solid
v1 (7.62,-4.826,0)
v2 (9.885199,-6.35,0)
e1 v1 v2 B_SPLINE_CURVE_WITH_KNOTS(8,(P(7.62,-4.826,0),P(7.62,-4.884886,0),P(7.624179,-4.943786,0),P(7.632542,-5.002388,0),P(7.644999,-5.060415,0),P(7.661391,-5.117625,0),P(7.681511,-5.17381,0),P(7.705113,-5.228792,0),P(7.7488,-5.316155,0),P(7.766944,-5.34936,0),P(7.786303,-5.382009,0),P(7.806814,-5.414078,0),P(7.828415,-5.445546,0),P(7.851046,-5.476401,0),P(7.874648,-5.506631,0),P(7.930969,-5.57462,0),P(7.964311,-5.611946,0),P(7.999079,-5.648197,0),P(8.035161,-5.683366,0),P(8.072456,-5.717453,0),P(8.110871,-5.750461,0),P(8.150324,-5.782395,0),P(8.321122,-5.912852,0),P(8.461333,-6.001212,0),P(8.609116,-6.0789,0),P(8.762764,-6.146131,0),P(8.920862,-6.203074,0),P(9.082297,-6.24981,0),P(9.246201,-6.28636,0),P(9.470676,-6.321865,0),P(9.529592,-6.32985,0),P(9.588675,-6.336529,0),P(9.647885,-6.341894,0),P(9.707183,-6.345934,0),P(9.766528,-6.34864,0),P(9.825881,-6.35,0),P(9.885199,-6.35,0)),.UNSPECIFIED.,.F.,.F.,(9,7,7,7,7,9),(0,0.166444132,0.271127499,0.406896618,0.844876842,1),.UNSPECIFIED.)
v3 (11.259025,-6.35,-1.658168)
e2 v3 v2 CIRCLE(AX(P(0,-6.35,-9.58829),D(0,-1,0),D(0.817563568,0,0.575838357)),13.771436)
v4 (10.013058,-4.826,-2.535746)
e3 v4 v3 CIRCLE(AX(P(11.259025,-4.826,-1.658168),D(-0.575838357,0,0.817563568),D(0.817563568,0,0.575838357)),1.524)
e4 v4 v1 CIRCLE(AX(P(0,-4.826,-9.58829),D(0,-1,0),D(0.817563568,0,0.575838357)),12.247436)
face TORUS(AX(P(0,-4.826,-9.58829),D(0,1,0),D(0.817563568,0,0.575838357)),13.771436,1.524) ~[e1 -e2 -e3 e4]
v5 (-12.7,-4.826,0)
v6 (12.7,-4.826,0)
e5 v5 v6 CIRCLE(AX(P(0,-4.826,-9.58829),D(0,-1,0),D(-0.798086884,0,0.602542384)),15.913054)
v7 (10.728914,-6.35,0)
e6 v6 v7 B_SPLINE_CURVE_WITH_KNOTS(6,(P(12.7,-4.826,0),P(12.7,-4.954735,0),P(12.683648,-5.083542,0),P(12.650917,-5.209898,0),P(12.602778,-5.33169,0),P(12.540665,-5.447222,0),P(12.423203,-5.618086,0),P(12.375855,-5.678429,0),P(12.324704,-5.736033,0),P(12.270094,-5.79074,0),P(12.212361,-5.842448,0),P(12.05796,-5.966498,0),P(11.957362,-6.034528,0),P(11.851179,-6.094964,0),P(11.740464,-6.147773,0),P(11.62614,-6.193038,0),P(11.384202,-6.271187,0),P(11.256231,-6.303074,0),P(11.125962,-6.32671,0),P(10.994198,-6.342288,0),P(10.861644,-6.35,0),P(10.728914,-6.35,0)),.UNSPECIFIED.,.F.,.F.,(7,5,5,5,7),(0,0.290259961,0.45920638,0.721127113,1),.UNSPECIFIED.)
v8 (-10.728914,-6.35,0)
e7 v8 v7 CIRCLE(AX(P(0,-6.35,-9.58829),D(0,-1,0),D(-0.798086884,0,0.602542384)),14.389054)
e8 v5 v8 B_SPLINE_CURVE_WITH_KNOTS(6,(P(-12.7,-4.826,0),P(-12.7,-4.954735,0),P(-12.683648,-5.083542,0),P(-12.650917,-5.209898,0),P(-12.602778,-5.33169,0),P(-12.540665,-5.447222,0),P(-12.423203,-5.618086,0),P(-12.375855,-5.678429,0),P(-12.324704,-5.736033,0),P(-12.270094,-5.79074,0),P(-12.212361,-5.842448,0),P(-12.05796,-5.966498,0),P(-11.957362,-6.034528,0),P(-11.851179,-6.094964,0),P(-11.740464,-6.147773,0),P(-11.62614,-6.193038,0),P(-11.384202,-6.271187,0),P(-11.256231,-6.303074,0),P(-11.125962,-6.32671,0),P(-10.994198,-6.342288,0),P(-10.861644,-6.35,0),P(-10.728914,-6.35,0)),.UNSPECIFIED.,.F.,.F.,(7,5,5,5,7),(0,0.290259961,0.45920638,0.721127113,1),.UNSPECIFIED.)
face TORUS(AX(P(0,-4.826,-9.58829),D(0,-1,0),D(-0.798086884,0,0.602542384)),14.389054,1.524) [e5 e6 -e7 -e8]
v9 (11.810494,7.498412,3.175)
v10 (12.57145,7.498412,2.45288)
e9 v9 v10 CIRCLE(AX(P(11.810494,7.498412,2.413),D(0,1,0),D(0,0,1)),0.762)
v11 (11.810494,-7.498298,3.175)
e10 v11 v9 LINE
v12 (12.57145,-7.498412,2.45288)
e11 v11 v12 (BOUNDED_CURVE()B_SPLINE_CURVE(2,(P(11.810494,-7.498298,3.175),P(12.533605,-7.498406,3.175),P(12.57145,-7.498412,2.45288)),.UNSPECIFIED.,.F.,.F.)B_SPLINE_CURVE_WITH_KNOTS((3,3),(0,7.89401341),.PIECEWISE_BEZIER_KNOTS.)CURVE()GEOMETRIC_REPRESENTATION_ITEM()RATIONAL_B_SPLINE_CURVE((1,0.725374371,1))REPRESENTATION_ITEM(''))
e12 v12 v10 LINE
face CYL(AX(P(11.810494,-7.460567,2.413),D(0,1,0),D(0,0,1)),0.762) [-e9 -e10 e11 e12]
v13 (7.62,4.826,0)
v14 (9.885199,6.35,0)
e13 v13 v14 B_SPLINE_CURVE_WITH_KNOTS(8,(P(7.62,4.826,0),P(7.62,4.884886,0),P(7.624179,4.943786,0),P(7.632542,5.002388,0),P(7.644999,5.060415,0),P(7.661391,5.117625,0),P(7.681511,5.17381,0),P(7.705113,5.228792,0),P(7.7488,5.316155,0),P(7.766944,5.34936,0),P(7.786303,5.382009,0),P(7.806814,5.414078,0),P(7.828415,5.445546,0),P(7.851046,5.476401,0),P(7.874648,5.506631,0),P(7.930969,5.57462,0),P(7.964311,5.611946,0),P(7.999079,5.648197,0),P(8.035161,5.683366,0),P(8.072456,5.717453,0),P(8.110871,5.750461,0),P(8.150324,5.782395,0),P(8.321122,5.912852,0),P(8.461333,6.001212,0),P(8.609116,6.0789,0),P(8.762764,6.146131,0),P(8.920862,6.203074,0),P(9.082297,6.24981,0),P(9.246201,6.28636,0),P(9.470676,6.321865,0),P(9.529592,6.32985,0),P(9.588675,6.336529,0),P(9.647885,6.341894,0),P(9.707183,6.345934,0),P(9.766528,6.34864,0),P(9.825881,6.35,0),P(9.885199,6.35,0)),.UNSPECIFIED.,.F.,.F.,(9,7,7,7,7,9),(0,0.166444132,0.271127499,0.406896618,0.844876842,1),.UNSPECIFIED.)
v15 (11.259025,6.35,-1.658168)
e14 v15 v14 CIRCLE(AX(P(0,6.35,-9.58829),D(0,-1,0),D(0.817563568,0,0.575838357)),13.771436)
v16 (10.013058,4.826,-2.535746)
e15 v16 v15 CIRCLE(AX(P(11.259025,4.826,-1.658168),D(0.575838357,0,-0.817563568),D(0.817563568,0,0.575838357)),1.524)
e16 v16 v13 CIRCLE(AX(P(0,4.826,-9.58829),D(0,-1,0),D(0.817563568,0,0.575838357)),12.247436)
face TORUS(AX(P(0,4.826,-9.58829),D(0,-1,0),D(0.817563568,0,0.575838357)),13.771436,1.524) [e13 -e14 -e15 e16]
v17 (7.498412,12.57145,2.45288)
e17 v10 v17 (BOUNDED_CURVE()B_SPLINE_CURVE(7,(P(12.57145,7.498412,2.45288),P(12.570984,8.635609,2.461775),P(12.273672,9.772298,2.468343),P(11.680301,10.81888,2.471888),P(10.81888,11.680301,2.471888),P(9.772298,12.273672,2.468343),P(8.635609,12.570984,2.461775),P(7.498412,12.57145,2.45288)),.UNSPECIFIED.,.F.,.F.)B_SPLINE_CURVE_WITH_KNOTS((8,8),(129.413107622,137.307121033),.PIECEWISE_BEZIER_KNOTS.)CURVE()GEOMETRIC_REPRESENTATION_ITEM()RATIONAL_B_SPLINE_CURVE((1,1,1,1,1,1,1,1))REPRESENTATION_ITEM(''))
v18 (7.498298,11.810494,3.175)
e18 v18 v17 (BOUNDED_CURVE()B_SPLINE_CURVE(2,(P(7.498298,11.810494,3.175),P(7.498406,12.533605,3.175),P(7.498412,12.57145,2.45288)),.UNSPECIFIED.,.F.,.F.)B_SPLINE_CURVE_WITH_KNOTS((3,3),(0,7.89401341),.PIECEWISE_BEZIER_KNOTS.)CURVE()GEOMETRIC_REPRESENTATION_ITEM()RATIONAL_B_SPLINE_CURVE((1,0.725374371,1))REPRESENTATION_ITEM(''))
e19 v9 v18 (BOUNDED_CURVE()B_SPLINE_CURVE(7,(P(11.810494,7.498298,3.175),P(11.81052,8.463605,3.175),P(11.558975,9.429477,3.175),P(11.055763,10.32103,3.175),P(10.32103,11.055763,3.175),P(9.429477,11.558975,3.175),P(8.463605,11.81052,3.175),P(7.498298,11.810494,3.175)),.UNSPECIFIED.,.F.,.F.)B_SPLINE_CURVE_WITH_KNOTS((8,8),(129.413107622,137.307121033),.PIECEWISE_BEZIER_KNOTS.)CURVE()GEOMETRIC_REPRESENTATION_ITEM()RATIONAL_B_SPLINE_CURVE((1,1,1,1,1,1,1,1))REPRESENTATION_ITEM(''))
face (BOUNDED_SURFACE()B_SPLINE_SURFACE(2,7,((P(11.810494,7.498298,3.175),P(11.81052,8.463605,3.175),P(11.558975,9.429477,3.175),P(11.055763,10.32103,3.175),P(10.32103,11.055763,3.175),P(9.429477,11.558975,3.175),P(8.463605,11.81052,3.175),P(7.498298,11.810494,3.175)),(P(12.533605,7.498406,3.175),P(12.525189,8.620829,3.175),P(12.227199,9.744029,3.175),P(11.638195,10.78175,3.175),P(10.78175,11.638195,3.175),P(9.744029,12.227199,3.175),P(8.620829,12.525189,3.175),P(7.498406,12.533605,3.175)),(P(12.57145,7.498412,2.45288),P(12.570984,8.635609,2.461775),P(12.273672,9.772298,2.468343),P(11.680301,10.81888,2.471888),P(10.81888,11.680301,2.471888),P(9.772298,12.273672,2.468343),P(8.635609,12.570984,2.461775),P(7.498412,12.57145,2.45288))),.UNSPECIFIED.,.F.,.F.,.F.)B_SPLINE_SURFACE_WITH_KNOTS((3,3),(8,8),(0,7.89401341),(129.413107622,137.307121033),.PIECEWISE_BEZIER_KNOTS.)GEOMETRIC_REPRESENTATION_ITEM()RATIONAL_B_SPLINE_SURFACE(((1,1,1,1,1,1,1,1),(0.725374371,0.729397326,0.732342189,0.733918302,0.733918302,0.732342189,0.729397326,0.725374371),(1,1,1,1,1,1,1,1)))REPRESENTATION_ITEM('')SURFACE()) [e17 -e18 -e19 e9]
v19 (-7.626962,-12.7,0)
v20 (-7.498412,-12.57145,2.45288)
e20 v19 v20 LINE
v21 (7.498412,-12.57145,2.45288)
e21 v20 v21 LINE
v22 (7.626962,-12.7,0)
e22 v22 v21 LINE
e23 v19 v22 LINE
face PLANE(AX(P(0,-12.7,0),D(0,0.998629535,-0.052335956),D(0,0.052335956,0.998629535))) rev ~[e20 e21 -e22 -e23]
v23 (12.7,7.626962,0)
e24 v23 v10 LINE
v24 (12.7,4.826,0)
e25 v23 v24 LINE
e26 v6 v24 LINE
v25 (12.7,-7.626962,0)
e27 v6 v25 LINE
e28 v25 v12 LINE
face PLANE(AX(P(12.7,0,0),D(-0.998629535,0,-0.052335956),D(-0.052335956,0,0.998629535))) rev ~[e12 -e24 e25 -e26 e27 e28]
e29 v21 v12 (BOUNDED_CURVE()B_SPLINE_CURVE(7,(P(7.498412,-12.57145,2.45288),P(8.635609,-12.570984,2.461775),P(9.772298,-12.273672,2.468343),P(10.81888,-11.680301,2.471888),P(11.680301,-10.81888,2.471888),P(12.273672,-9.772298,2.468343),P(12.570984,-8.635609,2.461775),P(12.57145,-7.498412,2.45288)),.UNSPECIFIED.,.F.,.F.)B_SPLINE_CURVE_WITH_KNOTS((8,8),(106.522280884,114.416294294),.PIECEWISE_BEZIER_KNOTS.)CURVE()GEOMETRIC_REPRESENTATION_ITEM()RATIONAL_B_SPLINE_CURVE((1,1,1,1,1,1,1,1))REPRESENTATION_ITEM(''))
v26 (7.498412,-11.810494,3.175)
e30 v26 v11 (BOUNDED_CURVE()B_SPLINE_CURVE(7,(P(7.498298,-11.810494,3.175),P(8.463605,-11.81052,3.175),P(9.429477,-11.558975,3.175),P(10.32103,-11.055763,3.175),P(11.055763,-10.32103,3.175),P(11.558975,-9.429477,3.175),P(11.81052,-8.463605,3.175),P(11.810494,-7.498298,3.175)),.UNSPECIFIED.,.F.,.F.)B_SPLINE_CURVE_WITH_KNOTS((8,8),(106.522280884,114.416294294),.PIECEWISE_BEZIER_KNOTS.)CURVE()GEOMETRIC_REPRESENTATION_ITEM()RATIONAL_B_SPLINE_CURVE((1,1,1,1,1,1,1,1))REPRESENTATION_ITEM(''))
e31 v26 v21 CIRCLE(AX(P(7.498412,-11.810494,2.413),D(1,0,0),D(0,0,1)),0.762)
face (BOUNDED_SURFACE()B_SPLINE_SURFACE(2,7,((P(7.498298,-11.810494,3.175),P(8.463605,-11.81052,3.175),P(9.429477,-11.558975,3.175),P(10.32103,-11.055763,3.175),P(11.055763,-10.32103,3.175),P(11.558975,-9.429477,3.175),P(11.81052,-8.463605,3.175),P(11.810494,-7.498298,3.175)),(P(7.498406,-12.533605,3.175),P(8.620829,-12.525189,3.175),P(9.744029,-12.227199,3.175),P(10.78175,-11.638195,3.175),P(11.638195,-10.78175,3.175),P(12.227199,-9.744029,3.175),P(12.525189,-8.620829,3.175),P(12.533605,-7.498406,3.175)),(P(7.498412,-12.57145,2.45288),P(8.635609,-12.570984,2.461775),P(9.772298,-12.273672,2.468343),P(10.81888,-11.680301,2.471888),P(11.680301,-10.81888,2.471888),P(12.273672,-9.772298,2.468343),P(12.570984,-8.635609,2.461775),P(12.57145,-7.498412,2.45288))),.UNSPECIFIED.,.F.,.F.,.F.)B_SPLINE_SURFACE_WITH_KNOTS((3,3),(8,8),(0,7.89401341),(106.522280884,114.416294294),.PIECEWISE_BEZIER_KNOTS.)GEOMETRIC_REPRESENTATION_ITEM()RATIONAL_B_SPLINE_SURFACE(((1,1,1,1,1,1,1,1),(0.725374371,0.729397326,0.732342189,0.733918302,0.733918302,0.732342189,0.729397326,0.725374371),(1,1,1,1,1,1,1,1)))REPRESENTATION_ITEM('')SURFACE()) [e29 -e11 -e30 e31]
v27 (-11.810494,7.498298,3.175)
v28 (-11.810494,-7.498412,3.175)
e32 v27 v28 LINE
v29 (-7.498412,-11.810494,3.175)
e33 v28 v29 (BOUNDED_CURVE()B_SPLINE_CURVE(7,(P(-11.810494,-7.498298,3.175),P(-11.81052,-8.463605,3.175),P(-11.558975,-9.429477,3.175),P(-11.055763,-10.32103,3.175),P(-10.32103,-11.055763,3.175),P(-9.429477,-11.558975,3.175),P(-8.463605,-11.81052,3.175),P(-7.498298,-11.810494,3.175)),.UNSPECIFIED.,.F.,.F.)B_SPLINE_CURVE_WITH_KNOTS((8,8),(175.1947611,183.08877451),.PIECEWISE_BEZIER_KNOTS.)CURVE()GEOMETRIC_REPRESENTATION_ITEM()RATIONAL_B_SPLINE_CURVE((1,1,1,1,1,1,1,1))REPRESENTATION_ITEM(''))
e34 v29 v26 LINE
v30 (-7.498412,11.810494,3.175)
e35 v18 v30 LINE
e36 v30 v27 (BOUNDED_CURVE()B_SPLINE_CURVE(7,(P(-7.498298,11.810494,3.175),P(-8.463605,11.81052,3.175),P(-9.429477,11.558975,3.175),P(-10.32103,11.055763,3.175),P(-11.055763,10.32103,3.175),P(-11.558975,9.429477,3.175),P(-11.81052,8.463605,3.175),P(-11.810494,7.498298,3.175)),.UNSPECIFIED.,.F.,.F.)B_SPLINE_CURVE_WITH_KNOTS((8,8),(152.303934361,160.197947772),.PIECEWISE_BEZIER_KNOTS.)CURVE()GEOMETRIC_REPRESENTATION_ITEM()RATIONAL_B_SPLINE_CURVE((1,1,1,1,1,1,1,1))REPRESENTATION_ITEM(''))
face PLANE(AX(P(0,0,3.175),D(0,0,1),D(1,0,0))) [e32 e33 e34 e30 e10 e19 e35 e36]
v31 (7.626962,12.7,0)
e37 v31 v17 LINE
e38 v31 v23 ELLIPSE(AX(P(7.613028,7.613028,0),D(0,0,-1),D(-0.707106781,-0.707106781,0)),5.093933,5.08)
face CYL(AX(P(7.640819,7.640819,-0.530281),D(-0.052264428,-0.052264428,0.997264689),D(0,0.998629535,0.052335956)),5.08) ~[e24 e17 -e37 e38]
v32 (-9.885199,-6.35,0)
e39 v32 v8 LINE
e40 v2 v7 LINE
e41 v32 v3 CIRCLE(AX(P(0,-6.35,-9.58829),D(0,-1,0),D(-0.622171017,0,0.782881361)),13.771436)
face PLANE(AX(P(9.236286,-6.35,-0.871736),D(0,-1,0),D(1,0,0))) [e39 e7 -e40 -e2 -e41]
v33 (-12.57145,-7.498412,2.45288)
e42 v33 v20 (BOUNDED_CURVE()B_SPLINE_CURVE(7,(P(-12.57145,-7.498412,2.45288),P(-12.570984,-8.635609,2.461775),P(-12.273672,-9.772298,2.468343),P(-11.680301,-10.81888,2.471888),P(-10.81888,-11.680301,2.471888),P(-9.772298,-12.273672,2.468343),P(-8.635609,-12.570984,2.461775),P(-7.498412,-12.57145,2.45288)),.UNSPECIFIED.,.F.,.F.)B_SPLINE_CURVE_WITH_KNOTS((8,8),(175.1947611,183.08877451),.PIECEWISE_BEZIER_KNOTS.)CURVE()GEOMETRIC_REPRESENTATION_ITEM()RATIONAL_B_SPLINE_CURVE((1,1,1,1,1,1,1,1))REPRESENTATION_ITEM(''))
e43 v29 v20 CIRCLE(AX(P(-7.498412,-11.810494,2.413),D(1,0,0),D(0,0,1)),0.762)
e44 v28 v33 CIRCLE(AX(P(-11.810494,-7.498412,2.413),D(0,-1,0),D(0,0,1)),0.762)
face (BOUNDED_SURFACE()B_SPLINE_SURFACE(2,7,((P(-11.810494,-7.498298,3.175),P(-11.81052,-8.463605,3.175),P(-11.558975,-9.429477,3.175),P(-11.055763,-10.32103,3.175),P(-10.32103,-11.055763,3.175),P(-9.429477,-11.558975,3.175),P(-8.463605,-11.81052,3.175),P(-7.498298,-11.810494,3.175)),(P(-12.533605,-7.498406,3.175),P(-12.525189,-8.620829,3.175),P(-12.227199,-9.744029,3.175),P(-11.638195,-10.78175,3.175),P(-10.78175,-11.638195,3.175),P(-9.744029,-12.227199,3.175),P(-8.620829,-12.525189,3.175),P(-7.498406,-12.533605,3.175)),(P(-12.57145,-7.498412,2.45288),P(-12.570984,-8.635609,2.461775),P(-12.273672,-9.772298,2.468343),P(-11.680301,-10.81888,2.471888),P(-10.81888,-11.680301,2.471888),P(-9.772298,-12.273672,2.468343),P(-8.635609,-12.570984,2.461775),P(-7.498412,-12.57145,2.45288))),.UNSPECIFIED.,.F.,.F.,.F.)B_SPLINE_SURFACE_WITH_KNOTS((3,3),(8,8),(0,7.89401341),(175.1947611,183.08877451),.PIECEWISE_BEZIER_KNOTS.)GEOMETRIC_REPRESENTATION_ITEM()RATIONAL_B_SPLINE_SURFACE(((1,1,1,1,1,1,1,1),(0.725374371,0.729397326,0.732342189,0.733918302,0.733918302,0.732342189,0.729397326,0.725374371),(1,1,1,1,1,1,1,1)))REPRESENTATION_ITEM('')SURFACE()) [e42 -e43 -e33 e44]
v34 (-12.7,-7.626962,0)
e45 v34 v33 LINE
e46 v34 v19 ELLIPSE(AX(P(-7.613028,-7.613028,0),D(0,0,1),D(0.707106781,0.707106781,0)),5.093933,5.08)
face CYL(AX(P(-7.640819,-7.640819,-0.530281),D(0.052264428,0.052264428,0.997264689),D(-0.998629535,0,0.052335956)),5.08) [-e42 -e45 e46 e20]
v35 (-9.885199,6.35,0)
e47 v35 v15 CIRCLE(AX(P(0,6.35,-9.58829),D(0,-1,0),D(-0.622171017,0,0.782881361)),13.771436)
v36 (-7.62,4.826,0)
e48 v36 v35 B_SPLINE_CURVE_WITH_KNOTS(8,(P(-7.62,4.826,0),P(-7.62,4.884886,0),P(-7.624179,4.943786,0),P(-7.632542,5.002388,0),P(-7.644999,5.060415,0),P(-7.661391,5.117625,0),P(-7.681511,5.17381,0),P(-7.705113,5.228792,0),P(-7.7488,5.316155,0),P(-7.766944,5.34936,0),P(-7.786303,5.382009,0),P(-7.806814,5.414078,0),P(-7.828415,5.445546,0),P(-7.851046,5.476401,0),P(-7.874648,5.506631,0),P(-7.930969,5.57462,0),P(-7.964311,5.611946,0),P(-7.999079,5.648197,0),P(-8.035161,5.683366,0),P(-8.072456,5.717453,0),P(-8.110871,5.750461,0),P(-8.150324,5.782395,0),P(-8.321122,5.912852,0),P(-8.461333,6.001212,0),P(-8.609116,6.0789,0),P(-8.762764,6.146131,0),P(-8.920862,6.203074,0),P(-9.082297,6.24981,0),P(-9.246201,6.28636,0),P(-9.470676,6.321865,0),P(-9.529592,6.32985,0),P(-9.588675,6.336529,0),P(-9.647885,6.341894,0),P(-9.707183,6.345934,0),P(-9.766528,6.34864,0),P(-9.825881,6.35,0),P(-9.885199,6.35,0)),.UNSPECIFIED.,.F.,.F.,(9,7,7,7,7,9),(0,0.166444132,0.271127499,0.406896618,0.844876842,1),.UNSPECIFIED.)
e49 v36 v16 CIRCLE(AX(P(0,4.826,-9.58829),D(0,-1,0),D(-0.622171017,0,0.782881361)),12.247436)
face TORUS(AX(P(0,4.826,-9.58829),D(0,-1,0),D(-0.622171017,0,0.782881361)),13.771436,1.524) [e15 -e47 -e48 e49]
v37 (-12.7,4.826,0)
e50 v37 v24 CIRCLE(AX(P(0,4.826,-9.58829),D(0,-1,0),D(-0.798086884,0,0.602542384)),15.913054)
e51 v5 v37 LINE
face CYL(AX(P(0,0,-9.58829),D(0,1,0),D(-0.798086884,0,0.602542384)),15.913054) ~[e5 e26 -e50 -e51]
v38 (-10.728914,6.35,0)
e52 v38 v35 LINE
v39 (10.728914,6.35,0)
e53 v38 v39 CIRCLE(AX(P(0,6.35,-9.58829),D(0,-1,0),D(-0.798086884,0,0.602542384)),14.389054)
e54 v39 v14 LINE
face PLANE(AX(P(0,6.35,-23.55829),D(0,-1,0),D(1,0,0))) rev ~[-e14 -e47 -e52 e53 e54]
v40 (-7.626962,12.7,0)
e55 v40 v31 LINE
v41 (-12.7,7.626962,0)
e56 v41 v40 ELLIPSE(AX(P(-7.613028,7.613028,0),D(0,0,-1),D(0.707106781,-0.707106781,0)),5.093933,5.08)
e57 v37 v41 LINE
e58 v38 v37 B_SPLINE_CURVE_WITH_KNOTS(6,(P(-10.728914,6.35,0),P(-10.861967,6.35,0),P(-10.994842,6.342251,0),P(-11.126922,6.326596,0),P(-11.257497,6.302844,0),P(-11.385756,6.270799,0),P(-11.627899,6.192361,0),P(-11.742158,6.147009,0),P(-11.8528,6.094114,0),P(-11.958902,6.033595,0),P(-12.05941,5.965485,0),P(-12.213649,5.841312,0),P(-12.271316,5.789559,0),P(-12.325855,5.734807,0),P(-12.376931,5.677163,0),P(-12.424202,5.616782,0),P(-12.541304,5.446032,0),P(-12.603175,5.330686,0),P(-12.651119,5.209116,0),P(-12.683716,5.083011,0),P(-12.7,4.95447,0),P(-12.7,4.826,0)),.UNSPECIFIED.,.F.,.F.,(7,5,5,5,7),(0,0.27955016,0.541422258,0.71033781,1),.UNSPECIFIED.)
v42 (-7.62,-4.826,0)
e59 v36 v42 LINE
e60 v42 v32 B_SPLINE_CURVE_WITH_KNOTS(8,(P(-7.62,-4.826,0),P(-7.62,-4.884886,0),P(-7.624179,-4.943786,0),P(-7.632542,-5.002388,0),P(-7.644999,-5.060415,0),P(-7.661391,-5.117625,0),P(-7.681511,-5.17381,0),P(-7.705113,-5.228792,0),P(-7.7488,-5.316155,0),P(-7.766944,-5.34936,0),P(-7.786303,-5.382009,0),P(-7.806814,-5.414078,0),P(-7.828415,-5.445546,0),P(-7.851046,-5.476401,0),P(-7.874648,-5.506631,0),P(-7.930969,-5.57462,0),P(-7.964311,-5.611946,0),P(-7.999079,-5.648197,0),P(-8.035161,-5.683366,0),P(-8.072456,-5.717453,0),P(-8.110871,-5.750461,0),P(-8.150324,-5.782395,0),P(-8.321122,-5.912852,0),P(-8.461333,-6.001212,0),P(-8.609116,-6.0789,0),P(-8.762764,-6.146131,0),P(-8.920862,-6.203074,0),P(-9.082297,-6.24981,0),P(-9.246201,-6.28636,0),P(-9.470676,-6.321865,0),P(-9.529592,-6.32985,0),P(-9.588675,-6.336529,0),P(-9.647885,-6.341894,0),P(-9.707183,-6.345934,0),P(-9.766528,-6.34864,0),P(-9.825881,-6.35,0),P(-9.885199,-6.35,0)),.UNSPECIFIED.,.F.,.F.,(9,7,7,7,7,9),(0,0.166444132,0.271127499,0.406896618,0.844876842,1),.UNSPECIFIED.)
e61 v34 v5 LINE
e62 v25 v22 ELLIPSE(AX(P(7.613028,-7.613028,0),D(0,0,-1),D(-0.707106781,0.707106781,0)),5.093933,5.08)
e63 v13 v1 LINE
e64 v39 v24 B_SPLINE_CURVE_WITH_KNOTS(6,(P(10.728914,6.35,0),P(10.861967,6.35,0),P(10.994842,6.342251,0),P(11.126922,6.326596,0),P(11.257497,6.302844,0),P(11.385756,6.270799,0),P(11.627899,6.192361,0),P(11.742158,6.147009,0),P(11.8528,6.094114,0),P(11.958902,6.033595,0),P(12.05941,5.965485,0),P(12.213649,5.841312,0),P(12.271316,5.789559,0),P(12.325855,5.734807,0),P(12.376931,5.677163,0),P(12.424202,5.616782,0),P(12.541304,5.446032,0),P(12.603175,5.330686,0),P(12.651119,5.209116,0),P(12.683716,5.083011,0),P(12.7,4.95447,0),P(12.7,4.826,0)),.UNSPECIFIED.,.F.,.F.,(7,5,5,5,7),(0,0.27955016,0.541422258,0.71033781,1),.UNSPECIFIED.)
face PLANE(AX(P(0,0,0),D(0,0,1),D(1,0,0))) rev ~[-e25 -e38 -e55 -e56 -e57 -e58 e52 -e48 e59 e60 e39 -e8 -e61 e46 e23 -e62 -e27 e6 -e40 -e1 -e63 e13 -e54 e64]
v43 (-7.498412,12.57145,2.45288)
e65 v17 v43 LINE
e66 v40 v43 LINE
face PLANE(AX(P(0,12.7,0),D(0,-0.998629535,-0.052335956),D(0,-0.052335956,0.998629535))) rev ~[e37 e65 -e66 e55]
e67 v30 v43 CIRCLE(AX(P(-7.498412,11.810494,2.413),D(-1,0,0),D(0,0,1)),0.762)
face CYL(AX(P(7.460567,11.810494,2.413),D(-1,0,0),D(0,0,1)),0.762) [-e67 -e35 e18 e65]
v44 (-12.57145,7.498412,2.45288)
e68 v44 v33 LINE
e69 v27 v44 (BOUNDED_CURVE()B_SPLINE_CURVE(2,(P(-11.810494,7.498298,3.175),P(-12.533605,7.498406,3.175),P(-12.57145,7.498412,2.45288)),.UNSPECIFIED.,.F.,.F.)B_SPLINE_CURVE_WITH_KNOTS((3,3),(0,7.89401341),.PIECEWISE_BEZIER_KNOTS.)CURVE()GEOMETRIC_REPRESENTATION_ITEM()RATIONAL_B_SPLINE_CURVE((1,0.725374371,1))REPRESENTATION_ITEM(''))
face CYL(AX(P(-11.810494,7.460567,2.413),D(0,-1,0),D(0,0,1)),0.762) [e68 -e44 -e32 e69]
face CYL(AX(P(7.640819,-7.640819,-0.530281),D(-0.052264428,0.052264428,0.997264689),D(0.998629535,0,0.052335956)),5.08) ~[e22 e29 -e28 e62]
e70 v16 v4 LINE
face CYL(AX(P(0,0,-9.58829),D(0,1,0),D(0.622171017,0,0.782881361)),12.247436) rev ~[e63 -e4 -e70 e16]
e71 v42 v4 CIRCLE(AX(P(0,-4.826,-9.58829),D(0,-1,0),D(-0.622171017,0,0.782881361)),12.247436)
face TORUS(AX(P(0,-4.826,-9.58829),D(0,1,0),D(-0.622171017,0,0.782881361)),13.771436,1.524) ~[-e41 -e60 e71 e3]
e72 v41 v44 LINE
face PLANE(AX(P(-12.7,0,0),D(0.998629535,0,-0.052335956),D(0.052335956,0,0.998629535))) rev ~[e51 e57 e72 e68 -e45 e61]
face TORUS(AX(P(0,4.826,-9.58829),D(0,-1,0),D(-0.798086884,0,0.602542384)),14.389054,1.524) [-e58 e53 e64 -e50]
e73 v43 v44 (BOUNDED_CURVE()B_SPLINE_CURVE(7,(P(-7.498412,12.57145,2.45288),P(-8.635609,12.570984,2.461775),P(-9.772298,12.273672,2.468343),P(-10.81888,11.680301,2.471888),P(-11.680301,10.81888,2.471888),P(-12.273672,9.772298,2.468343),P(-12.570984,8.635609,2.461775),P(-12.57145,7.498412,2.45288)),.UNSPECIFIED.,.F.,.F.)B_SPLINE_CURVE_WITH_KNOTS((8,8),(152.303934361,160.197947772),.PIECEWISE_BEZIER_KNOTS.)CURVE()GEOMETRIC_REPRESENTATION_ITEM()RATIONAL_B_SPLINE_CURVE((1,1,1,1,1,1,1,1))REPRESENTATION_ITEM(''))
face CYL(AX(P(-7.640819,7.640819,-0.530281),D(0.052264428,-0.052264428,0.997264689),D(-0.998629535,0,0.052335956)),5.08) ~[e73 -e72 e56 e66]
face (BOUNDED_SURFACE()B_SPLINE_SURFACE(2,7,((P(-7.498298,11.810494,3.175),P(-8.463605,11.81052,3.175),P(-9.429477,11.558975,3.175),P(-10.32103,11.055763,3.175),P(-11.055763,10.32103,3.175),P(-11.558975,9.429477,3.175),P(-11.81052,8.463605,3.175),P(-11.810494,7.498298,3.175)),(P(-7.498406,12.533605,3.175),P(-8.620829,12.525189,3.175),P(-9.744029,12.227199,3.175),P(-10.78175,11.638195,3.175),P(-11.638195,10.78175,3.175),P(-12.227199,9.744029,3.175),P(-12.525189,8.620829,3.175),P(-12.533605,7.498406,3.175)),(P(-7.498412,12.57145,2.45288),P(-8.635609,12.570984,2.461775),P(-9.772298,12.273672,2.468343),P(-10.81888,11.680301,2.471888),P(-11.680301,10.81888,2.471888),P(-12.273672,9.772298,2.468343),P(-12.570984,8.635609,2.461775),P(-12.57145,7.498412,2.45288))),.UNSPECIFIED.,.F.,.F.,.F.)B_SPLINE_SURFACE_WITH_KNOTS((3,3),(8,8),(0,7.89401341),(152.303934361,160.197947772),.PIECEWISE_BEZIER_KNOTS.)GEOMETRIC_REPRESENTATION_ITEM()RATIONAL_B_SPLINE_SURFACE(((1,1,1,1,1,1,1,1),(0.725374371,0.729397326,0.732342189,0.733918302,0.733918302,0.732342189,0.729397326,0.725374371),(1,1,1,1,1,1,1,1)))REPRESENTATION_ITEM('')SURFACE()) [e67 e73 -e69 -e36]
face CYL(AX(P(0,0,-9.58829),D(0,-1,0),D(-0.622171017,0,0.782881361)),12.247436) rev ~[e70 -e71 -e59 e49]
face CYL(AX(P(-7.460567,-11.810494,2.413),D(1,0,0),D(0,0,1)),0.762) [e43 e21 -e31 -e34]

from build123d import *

# Parameters (mm, degrees)
F0_W          = 25.4
F0_H          = 25.4
F1_DEPTH      = 3.175
F1_TAPER      = 3
F3_W          = 5.08
F3_H          = 12.7
F6_DEPTH      = 6.35
F6_DEPTH_BACK = 6.35
F7_R          = 5.08
F8_R          = 1.524
F9_R          = 0.762


with BuildPart() as f1:
    # F0 (on Top) → F1 (new body)
    with BuildSketch(Plane.XY):
        Rectangle(F0_W, F0_H)
    extrude(amount=F1_DEPTH, taper=F1_TAPER)

    # F4: sweep along a path in F2
    with BuildLine(Plane.XZ) as f4_path:
        ThreePointArc((-10.16, 0), (0, -23.5582897328), (10.16, 0))
    # F3 (on face) → F4 (sweep)
    with BuildSketch(Plane(origin=(0, 0, 0), x_dir=(1, 0, 0), z_dir=(0, 0, -1))):
        with Locations((-10.16, 0)):
            Rectangle(F3_W, F3_H)
    sweep(path=f4_path.line)

    # F5 (on Front) → F6 (join, two sides)
    with BuildSketch(Plane.XZ) as f6_sk:
        with BuildLine():
            Line((10.0130578512, -2.535746045), (10.16, 0))
            Line((10.16, 0), (7.62, 0))
            ThreePointArc((7.62, 0), (8.9072265211, -1.1822790439), (10.0130578512, -2.535746045))
        make_face()
    extrude(amount=F6_DEPTH)
    extrude(f6_sk.sketch, amount=-F6_DEPTH_BACK)

    # F7
    f7_edges = [f1.edges().sort_by_distance(p)[0] for p in [
        (12.616803, 12.616803, 1.5875),
        (12.616803, -12.616803, 1.5875),
        (-12.616803, -12.616803, 1.5875),
        (-12.616803, 12.616803, 1.5875),
    ]]
    fillet(f7_edges, radius=F7_R)

    # F8
    f8_edges = [f1.edges().sort_by_distance(p)[0] for p in [
        (-1.743325, 6.35, -21.711017),
        (-1.743325, -6.35, -21.711017),
        (8.907227, -6.35, -1.182279),
        (0, -6.35, -25.501344),
        (0, 6.35, -25.501344),
        (8.907227, 6.35, -1.182279),
    ]]
    fillet(f8_edges, radius=F8_R)

    # F9
    f9_edges = [f1.edges().sort_by_distance(p)[0] for p in [
        (0, -12.533605, 3.175),
        (-11.048589, -11.048589, 3.175),
        (11.048589, -11.048589, 3.175),
        (-12.533605, 0, 3.175),
        (12.533605, 0, 3.175),
        (-11.048589, 11.048589, 3.175),
        (11.048589, 11.048589, 3.175),
        (0, 12.533605, 3.175),
    ]]
    fillet(f9_edges, radius=F9_R)


solid = f1.part
